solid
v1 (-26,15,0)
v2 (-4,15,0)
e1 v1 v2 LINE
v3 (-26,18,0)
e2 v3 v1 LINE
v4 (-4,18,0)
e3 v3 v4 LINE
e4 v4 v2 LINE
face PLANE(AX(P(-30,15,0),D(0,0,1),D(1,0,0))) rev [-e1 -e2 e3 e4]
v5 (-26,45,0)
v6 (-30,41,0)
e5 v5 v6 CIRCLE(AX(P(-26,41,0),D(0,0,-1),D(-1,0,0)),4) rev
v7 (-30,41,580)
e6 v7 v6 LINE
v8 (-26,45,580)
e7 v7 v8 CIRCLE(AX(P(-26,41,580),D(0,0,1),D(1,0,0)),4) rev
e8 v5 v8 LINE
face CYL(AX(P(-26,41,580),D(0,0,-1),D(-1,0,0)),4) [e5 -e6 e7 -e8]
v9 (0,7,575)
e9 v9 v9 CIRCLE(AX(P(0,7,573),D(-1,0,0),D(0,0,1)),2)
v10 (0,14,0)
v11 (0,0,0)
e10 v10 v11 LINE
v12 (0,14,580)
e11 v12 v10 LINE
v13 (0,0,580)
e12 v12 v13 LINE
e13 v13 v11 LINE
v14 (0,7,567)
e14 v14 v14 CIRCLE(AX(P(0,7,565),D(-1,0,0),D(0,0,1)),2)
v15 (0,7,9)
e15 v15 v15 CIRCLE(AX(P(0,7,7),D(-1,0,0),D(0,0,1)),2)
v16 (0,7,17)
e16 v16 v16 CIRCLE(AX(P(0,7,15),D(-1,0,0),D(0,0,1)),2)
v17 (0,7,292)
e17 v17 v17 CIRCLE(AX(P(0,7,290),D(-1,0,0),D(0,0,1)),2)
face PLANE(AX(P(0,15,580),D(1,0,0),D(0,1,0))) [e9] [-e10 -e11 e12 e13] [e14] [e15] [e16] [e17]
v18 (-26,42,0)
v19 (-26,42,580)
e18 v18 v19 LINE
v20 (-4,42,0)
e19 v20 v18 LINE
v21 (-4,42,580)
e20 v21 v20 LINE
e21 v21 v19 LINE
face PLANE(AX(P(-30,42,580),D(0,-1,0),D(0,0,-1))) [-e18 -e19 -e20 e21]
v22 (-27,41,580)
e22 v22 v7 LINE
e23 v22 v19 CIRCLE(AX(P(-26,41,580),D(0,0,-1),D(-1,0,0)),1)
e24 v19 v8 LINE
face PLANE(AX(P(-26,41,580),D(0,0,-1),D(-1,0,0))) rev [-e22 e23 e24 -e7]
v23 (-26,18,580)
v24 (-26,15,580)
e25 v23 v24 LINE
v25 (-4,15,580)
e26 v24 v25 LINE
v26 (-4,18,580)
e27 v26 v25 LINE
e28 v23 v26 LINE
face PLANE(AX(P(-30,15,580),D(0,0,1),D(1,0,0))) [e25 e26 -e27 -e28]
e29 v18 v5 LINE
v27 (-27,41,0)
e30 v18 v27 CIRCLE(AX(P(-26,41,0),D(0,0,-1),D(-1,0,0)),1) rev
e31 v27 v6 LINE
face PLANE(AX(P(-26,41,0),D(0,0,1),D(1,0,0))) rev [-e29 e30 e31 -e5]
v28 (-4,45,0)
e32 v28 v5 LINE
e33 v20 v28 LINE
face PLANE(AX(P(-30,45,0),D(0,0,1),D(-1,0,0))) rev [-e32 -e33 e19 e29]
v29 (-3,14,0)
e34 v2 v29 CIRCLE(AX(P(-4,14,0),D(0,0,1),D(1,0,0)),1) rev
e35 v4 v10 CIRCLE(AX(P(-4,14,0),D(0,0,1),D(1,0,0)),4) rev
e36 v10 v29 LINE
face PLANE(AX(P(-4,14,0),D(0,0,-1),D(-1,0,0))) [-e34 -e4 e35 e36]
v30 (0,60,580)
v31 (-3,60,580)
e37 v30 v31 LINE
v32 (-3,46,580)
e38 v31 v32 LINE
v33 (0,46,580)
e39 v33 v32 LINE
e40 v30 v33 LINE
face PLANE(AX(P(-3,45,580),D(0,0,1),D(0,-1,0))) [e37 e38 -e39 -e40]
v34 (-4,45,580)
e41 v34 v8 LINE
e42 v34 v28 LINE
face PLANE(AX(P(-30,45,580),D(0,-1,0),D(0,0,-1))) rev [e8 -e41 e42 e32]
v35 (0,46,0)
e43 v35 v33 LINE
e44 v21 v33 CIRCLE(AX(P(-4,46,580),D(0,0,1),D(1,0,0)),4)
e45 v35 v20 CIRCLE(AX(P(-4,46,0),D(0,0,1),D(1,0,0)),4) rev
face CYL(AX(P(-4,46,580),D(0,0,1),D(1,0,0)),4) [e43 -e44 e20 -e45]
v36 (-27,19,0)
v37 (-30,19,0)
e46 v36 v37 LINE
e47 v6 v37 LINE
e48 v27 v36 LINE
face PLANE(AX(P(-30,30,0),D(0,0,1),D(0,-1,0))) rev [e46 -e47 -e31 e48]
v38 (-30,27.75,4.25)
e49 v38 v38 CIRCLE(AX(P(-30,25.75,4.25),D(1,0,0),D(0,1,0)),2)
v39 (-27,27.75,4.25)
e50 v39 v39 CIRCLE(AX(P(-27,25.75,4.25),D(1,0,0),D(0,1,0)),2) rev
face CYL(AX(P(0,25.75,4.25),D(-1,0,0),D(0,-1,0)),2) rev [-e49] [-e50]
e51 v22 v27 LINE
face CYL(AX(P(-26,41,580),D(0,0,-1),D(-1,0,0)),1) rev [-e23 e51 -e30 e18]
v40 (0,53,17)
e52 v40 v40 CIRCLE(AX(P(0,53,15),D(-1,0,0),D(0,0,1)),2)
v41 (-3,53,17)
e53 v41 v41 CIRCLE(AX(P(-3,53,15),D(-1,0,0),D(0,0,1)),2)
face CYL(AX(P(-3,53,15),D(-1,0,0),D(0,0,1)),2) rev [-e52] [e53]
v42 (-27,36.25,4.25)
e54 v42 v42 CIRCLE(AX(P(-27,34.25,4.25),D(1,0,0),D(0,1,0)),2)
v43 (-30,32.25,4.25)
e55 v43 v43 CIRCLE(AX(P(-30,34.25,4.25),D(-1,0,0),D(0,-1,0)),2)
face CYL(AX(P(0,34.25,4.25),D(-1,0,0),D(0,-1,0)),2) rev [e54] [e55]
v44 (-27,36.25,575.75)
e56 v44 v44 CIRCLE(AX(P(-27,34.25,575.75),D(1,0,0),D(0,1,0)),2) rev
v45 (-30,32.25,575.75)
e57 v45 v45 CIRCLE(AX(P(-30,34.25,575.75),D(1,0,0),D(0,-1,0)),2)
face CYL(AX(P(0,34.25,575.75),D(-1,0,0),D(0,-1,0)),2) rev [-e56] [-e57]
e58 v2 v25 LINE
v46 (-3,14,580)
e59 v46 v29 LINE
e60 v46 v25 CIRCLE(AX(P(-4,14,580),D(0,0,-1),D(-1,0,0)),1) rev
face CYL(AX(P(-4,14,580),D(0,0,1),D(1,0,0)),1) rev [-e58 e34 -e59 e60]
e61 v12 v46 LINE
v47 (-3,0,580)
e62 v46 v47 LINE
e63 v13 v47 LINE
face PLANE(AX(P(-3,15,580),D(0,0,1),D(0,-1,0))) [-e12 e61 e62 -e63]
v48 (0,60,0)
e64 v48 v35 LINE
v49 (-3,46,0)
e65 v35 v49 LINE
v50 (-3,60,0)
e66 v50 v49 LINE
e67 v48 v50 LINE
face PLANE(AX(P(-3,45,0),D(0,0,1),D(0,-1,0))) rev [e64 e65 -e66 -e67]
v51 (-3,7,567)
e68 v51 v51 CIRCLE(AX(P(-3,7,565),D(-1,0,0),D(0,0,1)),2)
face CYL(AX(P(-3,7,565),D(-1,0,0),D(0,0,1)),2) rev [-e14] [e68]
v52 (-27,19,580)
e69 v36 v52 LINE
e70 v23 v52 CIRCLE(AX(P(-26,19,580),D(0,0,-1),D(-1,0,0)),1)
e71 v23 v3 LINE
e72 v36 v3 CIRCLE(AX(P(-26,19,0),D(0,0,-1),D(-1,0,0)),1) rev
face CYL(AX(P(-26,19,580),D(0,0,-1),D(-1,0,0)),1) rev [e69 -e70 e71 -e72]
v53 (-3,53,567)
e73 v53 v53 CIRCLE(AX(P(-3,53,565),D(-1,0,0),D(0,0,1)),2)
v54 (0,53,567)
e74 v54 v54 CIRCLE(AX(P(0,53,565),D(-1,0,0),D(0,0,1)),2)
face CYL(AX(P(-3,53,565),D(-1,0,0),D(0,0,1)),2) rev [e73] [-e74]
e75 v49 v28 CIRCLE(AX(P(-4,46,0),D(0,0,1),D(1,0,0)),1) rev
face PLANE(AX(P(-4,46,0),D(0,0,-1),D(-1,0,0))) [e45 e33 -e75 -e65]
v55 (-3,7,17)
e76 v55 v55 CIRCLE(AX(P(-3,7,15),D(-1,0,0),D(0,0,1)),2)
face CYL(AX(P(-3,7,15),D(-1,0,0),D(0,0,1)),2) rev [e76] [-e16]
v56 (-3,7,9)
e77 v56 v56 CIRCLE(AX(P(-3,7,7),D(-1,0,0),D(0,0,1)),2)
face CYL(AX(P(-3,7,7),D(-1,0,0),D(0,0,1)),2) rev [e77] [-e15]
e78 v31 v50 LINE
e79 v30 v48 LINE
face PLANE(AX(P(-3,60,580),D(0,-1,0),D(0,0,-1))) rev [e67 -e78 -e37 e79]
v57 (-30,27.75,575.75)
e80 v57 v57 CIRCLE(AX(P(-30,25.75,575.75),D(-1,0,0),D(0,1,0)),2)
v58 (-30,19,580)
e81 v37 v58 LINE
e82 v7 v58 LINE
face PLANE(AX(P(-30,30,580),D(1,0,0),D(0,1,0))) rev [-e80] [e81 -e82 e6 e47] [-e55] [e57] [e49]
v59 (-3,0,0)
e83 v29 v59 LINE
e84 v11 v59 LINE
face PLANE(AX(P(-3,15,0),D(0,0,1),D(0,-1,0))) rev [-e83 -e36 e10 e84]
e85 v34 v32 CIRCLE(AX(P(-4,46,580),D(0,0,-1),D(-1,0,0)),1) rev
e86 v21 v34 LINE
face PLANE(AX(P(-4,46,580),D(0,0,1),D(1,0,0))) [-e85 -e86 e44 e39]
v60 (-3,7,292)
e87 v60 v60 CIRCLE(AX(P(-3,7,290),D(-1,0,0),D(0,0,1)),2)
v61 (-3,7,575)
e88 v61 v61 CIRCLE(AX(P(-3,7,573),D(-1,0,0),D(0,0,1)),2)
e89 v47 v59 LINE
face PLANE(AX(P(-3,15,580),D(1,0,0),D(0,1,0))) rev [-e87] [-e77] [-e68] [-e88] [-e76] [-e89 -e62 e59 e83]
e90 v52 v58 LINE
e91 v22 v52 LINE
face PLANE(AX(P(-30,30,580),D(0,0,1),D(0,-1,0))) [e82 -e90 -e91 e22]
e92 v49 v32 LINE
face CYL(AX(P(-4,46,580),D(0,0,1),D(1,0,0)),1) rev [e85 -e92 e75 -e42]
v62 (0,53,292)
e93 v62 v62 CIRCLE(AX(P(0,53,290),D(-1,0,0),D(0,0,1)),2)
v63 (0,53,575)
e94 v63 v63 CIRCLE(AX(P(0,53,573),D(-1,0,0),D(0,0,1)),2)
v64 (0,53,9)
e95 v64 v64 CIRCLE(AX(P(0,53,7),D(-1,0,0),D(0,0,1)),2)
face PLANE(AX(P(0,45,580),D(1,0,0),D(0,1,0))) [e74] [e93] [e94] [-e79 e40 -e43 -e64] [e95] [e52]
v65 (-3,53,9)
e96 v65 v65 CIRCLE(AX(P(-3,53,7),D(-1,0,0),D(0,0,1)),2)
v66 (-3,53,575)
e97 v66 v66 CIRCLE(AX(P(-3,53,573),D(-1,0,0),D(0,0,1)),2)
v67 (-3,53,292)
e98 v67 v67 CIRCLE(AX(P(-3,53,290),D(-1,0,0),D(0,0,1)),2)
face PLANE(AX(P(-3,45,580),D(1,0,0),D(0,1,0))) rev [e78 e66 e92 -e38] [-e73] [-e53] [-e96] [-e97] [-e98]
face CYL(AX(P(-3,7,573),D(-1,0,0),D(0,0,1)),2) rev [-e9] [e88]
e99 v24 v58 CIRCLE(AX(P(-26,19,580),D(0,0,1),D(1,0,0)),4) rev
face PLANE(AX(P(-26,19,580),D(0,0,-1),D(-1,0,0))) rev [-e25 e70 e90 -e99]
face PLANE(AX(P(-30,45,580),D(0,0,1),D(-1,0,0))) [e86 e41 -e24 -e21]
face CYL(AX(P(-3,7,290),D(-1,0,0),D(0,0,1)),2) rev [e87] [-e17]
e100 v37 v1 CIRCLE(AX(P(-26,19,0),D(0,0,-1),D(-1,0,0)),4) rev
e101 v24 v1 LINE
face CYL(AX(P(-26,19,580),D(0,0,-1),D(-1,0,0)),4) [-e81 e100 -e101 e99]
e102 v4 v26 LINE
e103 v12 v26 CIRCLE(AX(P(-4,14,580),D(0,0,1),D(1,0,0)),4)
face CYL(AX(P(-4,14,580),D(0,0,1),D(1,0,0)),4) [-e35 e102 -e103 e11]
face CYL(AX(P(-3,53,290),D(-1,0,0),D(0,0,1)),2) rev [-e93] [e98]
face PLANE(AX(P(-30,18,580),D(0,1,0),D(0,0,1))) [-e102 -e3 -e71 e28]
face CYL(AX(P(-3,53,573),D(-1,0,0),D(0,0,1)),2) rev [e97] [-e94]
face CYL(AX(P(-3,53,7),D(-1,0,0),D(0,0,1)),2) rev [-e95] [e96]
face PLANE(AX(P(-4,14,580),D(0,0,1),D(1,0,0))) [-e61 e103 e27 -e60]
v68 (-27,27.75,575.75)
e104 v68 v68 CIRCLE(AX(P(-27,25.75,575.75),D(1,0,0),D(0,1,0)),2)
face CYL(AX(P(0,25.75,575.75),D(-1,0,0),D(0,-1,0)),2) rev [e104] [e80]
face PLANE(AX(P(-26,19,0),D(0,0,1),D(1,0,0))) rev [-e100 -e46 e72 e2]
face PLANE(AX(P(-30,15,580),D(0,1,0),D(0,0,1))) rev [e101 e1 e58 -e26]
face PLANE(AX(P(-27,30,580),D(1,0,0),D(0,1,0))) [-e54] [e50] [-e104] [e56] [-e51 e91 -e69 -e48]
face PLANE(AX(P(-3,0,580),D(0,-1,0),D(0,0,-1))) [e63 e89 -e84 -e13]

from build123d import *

# Parameters (mm, degrees)
DODANIE_WYCI_GNI_CIE1_DEPTH = 580
KONWERTUJ_BRY_1_DEPTH       = 580
KONWERTUJ_BRY_1_2_DEPTH     = 580
OTW_R1_D                    = 4
LUSTRO2_COPY_1_D            = 4
OTW_R2_D                    = 4
SZKIC7_R                    = 2
WYTNIJ_WYCI_GNI_CIE1_DEPTH  = 584.86642308
LUSTRO5_COPY_1_SKETCH_R     = 2
LUSTRO5_COPY_1_DEPTH        = 584.86642308


# Read off the part's stored shape, not the designer's step: Konwertuj bryłę1
with BuildPart() as part:
    # Szkic2 → Dodanie-wyciągnięcie1 (new body)
    with BuildSketch(Plane.XY):
        Polygon((0, 0), (0, 30), (0, 60), (-3, 60), (-3, 45), (-30, 45), (-30, 30), (-30, 15), (-3, 15), (-3, 0), align=None)
    extrude(amount=DODANIE_WYCI_GNI_CIE1_DEPTH)

    # Konwertuj bryłę1 outline → Konwertuj bryłę1 (cut)
    with BuildSketch(Plane.XY):
        with BuildLine():
            Line((-30, 45), (-30, 41))
            ThreePointArc((-30, 41), (-28.828427125, 43.828427125), (-26, 45))
            Line((-26, 45), (-30, 45))
        make_face()
        with BuildLine():
            Line((-30, 15), (-26, 15))
            ThreePointArc((-26, 15), (-28.828427125, 16.171572875), (-30, 19))
            Line((-30, 19), (-30, 15))
        make_face()
        with BuildLine():
            Line((-26, 18), (-4, 18))
            ThreePointArc((-4, 18), (-1.171572875, 16.828427125), (0, 14))
            Line((0, 14), (0, 46))
            ThreePointArc((0, 46), (-1.171572875, 43.171572875), (-4, 42))
            Line((-4, 42), (-26, 42))
            ThreePointArc((-26, 42), (-26.707106781, 41.707106781), (-27, 41))
            Line((-27, 41), (-27, 19))
            ThreePointArc((-27, 19), (-26.707106781, 18.292893219), (-26, 18))
        make_face()
    extrude(amount=KONWERTUJ_BRY_1_DEPTH, mode=Mode.SUBTRACT)

    # Konwertuj bry_1 2 outline → Konwertuj bry_1 2 (add)
    with BuildSketch(Plane.XY):
        with BuildLine():
            ThreePointArc((-3, 46), (-3.292893219, 45.292893219), (-4, 45))
            Line((-4, 45), (-3, 45))
            Line((-3, 45), (-3, 46))
        make_face()
        with BuildLine():
            ThreePointArc((-4, 15), (-3.292893219, 14.707106781), (-3, 14))
            Line((-3, 14), (-3, 15))
            Line((-3, 15), (-4, 15))
        make_face()
    extrude(amount=KONWERTUJ_BRY_1_2_DEPTH)

    # Otwór1 (through all)
    with Locations(Plane.ZY.offset(3)):
        with Locations((573, 53), (565, 53)):
            otw_r1 = Hole(OTW_R1_D / 2)

    # Lustro1: Otwór1 across plane
    add(otw_r1.mirror(Plane(origin=(0, 30, 0), x_dir=(0, 0, 1), z_dir=(0, -1, 0))), mode=Mode.SUBTRACT)

    # Lustro2: Otwór1 across plane
    add(otw_r1.mirror(Plane.XY.offset(290)), mode=Mode.SUBTRACT)

    # Lustro2 copy 1 (through all)
    with Locations(Plane(origin=(-3, 60, 580), x_dir=(0, 0, -1), z_dir=(-1, 0, 0))):
        with Locations((573, 53), (565, 53)):
            Hole(LUSTRO2_COPY_1_D / 2)

    # Otwór2 (through all)
    with Locations(Plane.ZY.offset(3)):
        with Locations((290, 53)):
            otw_r2 = Hole(OTW_R2_D / 2)

    # Lustro3: Otwór2 across plane
    add(otw_r2.mirror(Plane(origin=(0, 30, 0), x_dir=(0, 0, 1), z_dir=(0, -1, 0))), mode=Mode.SUBTRACT)

    # Szkic7 → Wytnij-wyciągnięcie1 (cut, through all)
    with BuildSketch(Plane.ZY.offset(30)):
        with Locations(Location((4.25, 34.25, 0), (0, 0, 270))):
            Circle(SZKIC7_R)
    wytnij_wyci_gni_cie1 = extrude(amount=-WYTNIJ_WYCI_GNI_CIE1_DEPTH, mode=Mode.SUBTRACT)

    # Lustro4: Wytnij-wyciągnięcie1 across plane
    add(wytnij_wyci_gni_cie1.mirror(Plane.XY.offset(290)), mode=Mode.SUBTRACT)

    # Lustro5: Wytnij-wyciągnięcie1 across plane
    add(wytnij_wyci_gni_cie1.mirror(Plane(origin=(0, 30, 0), x_dir=(0, 0, 1), z_dir=(0, -1, 0))), mode=Mode.SUBTRACT)

    # Lustro5 copy 1 sketch → Lustro5 copy 1 (cut, through all)
    with BuildSketch(Plane(origin=(-30, 60, 580), x_dir=(0, 0, -1), z_dir=(-1, 0, 0))):
        with Locations(Location((4.25, 34.25, 0), (0, 0, 270))):
            Circle(LUSTRO5_COPY_1_SKETCH_R)
    extrude(amount=-LUSTRO5_COPY_1_DEPTH, mode=Mode.SUBTRACT)


solid = part.part
